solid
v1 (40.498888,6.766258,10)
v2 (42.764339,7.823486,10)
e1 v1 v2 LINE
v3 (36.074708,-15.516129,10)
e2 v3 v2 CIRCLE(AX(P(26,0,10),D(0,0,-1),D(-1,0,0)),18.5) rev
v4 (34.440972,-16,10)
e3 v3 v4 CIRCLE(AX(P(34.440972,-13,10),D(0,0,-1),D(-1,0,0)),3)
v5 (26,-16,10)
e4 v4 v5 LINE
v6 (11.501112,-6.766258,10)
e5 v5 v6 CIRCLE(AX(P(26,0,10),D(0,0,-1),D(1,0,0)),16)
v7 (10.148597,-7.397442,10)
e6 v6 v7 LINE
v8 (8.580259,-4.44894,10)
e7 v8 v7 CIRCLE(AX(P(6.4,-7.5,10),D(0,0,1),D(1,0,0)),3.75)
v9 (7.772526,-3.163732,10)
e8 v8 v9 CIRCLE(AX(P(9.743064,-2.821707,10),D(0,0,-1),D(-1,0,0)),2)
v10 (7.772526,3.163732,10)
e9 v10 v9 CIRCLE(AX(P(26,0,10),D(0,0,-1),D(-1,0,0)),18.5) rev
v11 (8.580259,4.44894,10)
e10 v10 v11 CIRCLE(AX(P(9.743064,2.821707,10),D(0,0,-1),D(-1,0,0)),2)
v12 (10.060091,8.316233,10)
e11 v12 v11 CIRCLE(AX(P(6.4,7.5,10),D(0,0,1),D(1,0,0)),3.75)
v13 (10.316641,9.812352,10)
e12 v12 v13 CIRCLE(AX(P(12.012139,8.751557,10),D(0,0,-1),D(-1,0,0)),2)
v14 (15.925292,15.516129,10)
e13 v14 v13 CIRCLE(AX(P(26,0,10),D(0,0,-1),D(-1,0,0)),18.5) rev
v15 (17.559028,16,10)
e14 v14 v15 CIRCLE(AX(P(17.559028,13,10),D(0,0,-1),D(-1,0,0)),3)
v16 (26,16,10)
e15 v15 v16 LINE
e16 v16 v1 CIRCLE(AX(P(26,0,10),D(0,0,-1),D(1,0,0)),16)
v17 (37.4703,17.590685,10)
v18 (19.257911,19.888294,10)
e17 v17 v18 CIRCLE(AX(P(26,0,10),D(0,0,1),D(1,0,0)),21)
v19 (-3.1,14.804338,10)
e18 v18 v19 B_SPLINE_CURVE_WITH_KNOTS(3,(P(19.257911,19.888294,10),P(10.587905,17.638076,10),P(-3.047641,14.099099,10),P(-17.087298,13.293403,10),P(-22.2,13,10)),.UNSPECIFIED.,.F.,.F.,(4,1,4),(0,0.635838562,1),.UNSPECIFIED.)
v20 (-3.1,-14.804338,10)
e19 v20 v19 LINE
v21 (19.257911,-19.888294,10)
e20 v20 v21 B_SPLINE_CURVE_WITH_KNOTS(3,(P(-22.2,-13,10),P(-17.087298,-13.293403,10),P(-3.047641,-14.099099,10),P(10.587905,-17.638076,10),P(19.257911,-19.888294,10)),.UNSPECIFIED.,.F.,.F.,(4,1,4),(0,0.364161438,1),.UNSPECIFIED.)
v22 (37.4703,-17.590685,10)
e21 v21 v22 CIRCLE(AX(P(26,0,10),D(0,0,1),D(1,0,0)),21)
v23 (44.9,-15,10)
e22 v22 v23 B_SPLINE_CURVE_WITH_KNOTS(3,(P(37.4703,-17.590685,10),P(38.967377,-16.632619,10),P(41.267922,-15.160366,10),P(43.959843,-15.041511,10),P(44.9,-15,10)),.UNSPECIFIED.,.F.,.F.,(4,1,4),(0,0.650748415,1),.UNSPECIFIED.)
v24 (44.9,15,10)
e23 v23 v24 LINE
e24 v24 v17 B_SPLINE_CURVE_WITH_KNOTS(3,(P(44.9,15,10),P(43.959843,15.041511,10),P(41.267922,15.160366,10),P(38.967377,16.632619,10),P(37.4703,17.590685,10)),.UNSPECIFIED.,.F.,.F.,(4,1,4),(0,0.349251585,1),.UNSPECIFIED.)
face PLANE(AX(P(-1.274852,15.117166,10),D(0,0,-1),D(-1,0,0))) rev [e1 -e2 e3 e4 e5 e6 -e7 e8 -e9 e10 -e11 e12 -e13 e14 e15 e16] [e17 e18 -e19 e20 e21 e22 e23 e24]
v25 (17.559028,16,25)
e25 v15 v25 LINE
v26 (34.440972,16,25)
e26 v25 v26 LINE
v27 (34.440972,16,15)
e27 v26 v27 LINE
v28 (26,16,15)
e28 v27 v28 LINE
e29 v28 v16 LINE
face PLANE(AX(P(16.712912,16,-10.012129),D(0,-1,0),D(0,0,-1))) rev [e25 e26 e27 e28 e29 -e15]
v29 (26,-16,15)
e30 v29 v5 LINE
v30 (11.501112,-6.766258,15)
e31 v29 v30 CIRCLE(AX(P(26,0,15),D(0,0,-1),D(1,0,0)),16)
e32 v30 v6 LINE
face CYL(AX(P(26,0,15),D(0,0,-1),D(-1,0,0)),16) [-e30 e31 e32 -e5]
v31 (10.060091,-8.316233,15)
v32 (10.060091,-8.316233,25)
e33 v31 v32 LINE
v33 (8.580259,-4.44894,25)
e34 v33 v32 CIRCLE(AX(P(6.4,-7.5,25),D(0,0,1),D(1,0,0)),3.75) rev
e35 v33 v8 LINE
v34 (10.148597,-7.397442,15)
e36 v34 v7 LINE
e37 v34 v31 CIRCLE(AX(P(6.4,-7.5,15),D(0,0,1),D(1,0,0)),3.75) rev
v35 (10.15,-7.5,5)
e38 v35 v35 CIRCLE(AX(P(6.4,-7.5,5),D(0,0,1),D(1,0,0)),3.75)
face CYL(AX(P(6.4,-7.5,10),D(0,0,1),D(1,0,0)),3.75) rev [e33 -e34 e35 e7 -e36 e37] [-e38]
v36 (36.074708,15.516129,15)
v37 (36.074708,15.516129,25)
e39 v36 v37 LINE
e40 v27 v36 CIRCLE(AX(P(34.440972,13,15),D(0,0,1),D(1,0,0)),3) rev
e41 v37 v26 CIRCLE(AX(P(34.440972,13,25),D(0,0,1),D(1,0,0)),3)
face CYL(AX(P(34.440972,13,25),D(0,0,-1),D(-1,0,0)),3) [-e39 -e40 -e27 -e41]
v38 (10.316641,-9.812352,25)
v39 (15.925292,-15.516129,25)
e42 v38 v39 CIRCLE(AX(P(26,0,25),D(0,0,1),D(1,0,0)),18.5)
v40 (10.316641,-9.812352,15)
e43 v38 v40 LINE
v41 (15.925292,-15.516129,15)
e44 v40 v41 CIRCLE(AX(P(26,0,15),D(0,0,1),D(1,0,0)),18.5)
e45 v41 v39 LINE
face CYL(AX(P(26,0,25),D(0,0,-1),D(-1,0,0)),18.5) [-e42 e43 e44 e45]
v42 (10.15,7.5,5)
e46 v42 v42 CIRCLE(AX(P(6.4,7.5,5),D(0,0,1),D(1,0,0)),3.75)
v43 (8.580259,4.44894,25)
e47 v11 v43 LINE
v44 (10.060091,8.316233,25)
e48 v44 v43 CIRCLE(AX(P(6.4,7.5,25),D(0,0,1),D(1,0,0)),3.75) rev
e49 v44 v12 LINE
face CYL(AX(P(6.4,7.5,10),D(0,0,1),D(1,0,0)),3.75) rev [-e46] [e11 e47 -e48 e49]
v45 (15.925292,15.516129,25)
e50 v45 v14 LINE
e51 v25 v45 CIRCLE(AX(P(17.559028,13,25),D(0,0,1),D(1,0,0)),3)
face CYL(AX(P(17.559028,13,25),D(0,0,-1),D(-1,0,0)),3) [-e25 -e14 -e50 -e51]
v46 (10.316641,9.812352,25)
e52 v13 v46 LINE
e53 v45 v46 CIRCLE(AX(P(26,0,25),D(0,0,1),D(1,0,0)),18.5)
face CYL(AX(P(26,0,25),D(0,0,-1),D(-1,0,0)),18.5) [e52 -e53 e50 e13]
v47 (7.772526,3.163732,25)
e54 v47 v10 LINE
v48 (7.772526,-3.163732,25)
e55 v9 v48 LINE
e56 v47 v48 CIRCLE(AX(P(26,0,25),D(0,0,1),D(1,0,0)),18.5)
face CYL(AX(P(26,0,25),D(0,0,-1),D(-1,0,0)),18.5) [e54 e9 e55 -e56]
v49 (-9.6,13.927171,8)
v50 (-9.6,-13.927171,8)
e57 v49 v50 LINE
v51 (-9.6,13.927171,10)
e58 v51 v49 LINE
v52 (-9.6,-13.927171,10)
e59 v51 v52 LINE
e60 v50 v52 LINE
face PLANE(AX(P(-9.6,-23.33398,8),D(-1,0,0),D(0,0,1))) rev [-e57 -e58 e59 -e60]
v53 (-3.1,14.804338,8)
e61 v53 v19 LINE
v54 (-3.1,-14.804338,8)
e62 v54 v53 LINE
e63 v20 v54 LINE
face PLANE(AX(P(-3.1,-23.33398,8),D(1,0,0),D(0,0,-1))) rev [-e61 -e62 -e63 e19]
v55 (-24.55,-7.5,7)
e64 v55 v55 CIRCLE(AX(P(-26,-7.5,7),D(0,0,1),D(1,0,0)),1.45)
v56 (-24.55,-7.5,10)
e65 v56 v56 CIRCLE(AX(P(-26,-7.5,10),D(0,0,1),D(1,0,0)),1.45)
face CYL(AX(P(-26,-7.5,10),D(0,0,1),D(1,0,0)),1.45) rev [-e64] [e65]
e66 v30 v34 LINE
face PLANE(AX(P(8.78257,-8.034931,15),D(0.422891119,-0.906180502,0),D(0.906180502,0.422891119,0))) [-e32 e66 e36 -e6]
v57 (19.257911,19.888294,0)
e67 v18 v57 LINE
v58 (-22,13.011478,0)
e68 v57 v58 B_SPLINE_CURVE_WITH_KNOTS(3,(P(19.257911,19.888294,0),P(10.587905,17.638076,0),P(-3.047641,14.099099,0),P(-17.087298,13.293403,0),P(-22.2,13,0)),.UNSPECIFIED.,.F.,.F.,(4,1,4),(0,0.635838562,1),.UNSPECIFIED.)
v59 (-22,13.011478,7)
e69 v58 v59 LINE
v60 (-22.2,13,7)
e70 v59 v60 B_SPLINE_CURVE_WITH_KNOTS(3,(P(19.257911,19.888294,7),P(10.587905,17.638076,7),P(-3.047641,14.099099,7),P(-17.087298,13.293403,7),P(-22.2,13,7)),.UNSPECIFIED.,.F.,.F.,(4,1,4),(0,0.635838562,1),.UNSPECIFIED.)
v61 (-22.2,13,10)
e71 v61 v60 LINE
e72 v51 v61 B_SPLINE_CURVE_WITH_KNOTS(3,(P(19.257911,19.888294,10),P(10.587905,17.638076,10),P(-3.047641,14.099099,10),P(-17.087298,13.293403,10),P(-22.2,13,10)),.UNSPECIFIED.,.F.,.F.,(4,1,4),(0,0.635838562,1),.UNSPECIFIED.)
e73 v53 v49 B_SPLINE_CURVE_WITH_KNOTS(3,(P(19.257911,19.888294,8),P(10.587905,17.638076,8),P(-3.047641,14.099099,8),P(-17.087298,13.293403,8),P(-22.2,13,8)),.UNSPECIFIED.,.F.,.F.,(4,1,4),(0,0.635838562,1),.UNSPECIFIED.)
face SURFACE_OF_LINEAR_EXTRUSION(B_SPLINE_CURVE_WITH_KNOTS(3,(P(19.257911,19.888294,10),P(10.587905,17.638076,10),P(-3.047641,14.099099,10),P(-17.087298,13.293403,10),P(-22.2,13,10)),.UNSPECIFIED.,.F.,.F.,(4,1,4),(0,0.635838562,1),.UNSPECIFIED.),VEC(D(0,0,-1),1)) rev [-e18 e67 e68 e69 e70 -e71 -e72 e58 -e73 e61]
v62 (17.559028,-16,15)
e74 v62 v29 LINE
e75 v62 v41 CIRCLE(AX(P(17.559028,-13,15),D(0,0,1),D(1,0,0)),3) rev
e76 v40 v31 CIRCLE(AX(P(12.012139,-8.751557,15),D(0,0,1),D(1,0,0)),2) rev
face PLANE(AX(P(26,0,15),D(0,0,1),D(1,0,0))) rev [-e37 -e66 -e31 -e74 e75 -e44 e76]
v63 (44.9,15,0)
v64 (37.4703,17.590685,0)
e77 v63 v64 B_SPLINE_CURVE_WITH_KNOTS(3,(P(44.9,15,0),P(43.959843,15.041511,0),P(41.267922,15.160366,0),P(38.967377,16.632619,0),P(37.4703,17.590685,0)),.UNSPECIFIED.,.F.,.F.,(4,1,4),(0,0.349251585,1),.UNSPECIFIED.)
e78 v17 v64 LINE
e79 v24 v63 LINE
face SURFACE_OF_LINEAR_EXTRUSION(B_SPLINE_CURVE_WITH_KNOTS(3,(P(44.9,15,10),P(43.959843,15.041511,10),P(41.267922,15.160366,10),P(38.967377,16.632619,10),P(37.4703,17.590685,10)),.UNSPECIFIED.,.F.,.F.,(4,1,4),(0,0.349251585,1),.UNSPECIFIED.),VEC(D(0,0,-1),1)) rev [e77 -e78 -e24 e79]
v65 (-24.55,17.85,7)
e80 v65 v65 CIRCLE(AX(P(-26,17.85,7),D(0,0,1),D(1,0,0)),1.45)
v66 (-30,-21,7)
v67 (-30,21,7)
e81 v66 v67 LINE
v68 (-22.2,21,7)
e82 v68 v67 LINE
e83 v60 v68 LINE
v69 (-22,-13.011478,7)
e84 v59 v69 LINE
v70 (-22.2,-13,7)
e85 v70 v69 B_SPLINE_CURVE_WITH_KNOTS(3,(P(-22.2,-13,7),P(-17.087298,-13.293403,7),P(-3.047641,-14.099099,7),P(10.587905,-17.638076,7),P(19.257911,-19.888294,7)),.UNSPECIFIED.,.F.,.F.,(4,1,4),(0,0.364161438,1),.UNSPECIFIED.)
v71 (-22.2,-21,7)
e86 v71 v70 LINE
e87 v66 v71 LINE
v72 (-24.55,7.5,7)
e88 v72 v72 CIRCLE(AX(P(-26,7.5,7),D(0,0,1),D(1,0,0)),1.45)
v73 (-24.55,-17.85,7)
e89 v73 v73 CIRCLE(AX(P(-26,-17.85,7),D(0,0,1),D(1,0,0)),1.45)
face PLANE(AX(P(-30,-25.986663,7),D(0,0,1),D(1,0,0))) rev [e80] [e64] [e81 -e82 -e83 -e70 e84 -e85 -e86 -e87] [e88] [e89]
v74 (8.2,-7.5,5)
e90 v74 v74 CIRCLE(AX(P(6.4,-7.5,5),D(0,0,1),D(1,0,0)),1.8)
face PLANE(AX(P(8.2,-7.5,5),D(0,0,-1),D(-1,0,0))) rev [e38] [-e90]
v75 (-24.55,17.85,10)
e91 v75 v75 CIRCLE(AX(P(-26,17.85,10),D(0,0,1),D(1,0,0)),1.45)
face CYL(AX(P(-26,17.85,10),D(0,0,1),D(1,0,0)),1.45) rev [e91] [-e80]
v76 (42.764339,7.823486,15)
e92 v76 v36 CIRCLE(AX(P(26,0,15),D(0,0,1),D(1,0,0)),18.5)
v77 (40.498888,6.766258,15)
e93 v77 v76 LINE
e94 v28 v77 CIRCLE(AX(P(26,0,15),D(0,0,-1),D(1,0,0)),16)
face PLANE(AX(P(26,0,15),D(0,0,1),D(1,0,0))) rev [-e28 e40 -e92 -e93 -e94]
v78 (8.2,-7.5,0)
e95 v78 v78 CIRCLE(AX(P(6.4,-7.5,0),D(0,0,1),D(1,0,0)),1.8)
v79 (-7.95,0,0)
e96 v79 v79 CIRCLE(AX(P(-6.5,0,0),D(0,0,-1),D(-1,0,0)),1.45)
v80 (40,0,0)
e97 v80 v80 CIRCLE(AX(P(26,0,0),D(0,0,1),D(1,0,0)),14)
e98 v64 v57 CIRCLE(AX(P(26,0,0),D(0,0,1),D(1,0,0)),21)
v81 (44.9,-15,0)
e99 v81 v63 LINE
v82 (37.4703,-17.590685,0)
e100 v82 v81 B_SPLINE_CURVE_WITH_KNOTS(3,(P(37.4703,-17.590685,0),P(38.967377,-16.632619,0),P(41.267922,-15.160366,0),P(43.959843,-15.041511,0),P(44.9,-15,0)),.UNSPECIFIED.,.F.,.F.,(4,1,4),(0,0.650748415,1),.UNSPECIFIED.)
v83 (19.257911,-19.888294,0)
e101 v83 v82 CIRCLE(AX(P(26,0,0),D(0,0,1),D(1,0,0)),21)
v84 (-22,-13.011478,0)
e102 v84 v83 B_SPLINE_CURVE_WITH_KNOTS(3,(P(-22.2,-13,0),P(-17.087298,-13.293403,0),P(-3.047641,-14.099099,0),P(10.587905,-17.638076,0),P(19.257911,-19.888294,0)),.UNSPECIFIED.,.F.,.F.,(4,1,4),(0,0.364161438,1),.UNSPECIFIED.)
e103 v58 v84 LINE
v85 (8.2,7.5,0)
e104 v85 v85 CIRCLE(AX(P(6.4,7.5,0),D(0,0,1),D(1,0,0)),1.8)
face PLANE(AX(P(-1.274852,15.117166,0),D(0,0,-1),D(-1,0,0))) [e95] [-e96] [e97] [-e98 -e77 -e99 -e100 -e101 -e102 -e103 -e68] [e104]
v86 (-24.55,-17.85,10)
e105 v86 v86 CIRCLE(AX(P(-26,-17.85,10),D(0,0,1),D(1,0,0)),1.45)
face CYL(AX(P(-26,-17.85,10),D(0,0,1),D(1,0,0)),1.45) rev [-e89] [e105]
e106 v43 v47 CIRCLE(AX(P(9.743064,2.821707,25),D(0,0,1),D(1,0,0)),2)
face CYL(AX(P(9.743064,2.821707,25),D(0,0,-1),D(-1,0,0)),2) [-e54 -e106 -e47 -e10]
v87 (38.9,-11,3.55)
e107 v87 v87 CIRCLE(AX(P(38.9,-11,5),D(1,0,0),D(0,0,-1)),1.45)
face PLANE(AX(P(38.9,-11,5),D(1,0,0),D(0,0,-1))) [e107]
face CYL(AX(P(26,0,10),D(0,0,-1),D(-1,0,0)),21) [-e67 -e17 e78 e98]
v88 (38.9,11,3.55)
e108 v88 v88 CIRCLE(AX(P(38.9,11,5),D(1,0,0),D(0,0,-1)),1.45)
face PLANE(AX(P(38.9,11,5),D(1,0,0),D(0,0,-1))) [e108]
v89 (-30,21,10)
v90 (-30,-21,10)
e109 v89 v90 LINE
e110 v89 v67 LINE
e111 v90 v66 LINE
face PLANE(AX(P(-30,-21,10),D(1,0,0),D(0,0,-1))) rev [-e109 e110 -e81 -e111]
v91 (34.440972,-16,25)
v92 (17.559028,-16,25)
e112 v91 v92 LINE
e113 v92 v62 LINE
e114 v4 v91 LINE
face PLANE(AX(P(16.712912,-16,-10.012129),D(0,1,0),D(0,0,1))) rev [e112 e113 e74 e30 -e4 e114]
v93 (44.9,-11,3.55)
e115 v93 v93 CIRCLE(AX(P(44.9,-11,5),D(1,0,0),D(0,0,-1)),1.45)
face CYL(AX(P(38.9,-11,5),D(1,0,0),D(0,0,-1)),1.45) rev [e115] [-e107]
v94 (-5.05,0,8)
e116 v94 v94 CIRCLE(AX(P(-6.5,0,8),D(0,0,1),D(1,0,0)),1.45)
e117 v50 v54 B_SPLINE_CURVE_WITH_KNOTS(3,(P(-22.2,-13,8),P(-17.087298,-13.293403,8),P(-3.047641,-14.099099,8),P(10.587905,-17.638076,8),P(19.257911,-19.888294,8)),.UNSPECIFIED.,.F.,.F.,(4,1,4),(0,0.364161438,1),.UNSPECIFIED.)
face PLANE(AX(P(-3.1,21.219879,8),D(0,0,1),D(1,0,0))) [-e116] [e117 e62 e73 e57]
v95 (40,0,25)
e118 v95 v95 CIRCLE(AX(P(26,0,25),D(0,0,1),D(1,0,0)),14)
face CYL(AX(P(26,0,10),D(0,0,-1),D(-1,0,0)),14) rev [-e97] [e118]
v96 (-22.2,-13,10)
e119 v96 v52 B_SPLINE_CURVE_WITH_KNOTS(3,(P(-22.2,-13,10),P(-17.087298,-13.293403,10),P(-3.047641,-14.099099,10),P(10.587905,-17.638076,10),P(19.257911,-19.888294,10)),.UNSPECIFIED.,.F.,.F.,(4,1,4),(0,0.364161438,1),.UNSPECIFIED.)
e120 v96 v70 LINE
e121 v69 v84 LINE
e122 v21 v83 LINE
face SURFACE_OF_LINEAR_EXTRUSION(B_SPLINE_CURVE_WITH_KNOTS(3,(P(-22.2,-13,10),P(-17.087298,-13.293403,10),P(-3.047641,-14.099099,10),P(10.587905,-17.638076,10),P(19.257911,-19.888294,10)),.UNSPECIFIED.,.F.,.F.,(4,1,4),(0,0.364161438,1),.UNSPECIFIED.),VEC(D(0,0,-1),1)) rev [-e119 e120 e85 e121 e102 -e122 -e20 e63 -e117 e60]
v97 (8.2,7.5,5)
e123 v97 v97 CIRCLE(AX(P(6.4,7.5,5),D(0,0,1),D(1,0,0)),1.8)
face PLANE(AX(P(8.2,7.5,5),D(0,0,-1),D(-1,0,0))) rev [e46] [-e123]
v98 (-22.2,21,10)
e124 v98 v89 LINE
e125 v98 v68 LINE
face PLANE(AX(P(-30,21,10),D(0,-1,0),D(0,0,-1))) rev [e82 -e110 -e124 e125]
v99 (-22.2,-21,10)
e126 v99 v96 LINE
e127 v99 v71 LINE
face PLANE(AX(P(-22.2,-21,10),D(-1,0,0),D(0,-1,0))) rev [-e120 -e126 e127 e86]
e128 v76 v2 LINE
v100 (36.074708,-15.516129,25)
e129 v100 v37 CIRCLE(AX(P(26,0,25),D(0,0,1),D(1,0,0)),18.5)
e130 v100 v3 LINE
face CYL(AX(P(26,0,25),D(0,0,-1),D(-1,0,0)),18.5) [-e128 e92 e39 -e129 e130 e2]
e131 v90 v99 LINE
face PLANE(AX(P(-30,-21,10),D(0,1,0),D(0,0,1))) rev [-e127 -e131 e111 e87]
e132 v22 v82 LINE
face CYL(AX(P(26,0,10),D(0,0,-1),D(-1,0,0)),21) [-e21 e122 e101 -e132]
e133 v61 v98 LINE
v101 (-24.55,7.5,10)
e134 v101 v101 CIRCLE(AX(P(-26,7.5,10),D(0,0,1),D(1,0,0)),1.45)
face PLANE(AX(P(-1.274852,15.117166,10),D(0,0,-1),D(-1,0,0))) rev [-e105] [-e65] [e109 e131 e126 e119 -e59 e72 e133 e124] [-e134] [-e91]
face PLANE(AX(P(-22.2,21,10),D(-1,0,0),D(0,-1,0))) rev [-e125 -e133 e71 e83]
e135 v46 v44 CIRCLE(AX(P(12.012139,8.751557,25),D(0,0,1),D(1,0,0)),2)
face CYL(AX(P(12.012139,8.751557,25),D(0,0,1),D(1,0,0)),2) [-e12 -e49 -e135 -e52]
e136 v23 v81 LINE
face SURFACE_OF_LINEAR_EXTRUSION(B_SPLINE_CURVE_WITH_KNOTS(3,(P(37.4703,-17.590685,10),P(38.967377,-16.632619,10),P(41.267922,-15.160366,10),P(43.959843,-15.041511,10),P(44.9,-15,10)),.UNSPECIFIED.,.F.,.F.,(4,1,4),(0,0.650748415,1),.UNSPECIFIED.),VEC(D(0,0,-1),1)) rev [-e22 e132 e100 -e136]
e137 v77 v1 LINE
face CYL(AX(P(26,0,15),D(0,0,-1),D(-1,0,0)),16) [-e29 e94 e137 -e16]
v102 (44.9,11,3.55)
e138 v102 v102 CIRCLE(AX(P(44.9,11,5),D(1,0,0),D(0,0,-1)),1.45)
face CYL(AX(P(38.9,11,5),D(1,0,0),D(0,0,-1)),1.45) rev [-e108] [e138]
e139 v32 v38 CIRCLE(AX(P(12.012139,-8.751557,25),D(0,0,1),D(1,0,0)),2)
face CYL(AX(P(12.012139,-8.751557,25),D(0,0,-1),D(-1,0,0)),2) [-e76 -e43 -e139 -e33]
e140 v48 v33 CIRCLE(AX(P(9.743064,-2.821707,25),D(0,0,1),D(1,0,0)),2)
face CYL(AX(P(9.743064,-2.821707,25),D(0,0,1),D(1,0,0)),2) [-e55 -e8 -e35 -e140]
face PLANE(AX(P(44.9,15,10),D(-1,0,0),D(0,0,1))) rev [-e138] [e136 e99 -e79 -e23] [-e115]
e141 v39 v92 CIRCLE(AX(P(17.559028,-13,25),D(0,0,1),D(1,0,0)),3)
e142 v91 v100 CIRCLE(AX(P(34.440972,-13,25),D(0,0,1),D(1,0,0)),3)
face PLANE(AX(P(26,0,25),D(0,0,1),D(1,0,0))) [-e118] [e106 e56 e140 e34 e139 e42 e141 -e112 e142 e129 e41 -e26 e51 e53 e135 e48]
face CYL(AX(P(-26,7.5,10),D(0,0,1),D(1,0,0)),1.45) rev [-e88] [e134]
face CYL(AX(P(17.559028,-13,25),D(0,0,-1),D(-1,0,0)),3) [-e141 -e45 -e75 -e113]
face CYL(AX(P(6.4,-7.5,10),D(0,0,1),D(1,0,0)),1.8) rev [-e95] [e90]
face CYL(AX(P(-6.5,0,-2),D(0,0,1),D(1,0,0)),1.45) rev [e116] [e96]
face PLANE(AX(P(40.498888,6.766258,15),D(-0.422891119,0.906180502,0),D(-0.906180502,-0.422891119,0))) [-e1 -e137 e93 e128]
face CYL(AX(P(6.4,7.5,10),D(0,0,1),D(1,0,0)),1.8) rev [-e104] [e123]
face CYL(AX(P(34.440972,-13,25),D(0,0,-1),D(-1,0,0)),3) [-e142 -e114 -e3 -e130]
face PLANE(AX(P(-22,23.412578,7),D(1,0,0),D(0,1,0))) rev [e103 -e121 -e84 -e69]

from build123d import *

# Parameters (mm, degrees)
SKETCH1_R                                     = 14
EXTRUDE1_DEPTH                                = 10
SKETCH3_R                                     = 18.5
SKETCH3_R_2                                   = 14
EXTRUDE2_DEPTH                                = 15
EXTRUDE3_DEPTH                                = 7
CBORE_FOR_M3_PAN_HEAD_MACHINE_SCREW1_AT_COUNT = 2
CBORE_FOR_M3_PAN_HEAD_MACHINE_SCREW1_AT_PITCH = 14.99999999999997
EXTRUDE4_START                                = 20
SKETCH6_R                                     = 3.7499999999999996
EXTRUDE4_DEPTH                                = 20
FILLET1_R                                     = 2
SKETCH8_W                                     = 18.574175621006713
SKETCH8_H                                     = 7.448846743952753
EXTRUDE5_DEPTH                                = 15
FILLET2_R                                     = 3
EXTRUDE8_DEPTH                                = 5
F_2_9_2_9_DIAMETER_HOLE1_D                    = 2.9
F_2_9_2_9_DIAMETER_HOLE1_DEPTH                = 10
SKETCH14_W                                    = 6.5
SKETCH14_H                                    = 44.553858890679976
EXTRUDE9_DEPTH                                = 2
SKETCH15_R                                    = 1.45
EXTRUDE10_DEPTH                               = 10
SKETCH16_R                                    = 1.45
EXTRUDE11_DEPTH                               = 6


with BuildPart() as part:
    # Sketch1 → Extrude1 (new body)
    with BuildSketch(Plane.XY):
        with BuildLine():
            Line((-30, 21), (-22.199999999999996, 21))
            Line((-22.199999999999996, 21), (-22.199999999999996, 13.000000000000002))
            add(Edge.make_bspline(
                [(-22.199999999999996, 13.000000000000002), (-17.087298132677002, 13.293403264574941), (-3.0476406189760237, 14.099098854681937), (10.587905202926116, 17.638075889977564), (19.257911052248826, 19.88829395952834)],
                knots=[0, 0, 0, 0, 0.36416143786510685, 1, 1, 1, 1], degree=3))
            ThreePointArc((19.257911052248826, 19.88829395952834), (28.628449534780575, 20.83485668400702), (37.47030029247324, 17.590685353347904))
            add(Edge.make_bspline(
                [(44.90000000000001, 15), (43.95984253847409, 15.041510539741976), (41.267922149986155, 15.160366234496765), (38.96737663845901, 16.632619120705193), (37.47030029247324, 17.590685353347904)],
                knots=[0, 0, 0, 0, 0.3492515846852426, 1, 1, 1, 1], degree=3))
            Line((44.90000000000001, 15), (44.90000000000001, -15))
            add(Edge.make_bspline(
                [(44.90000000000001, -15), (43.95984253847409, -15.041510539741976), (41.267922149986155, -15.160366234496761), (38.96737663845901, -16.632619120705193), (37.47030029247324, -17.590685353347904)],
                knots=[0, 0, 0, 0, 0.3492515846852426, 1, 1, 1, 1], degree=3))
            ThreePointArc((37.47030029247324, -17.590685353347904), (28.628449534780575, -20.834856684007015), (19.257911052248826, -19.88829395952834))
            add(Edge.make_bspline(
                [(-22.199999999999996, -13.000000000000002), (-17.087298132677002, -13.293403264574941), (-3.0476406189760232, -14.099098854681936), (10.587905202926116, -17.638075889977564), (19.257911052248826, -19.88829395952834)],
                knots=[0, 0, 0, 0, 0.36416143786510685, 1, 1, 1, 1], degree=3))
            Line((-22.199999999999996, -13.000000000000002), (-22.199999999999996, -21))
            Line((-22.199999999999996, -21), (-30, -21))
            Line((-30, -21), (-30, 21))
        make_face()
        with Locations((26.000000000000004, 0)):
            Circle(SKETCH1_R, mode=Mode.SUBTRACT)
    extrude(amount=EXTRUDE1_DEPTH)

    # Sketch3 → Extrude2 (add)
    with BuildSketch(Plane.XY.offset(10)):
        with Locations(Location((26.000000000000004, 0, 0), (0, 0, 180))):
            Circle(SKETCH3_R)
        with Locations((26.000000000000004, 0)):
            Circle(SKETCH3_R_2, mode=Mode.SUBTRACT)
    extrude(amount=EXTRUDE2_DEPTH)

    # Sketch4 → Extrude3 (cut)
    with BuildSketch(Plane(origin=(0, 0, 0), x_dir=(-1, 0, 0), z_dir=(0, 0, -1))):
        Polygon((30, 23.412577815179247), (22, 23.412577815179247), (22.000000000000007, -25.98666339363831), (30.000000000000007, -25.98666339363831), align=None)
    extrude(amount=-EXTRUDE3_DEPTH, mode=Mode.SUBTRACT)

    # Sketch5 → CBORE for M3 Pan Head Machine Screw1 (revolve, cut)
    with BuildSketch(Plane(origin=(6.399999999999998, 7.499999999999986, 10), x_dir=(0, -1, 0), z_dir=(1, 0, 0))):
        Polygon((0, 0), (-2.45e-15, 9.999999999999998), (1.7999999999999978, 10), (1.7999999999999994, 4.999999999999999), (3.749999999999999, 4.999999999999999), (3.75, 0), align=None)
    cbore_for_m3_pan_head_machine_screw1 = revolve(axis=Axis((6.399999999999998, 7.499999999999986, 16.34999999999999), (0, 0, -1)), mode=Mode.SUBTRACT)

    # CBORE for M3 Pan Head Machine Screw1 at: CBORE for M3 Pan Head Machine Screw1 ×2
    with Locations(*[(0, -i * CBORE_FOR_M3_PAN_HEAD_MACHINE_SCREW1_AT_PITCH, 0) for i in range(1, CBORE_FOR_M3_PAN_HEAD_MACHINE_SCREW1_AT_COUNT)]):
        add(cbore_for_m3_pan_head_machine_screw1, mode=Mode.SUBTRACT)

    # Sketch6 → Extrude4 (cut)
    with BuildSketch(Plane.XY.offset(10).offset(EXTRUDE4_START)):
        with Locations((6.399999999999998, 7.499999999999986)):
            Circle(SKETCH6_R)
        with Locations((6.399999999999998, -7.499999999999984)):
            Circle(SKETCH6_R)
    extrude(amount=-EXTRUDE4_DEPTH, mode=Mode.SUBTRACT)

    # Fillet1
    fillet1_edges = [part.edges().sort_by_distance(p)[0] for p in [
        (7.957487706286119, -4.088734539094374, 17.5),
        (9.836860741750934, -9.000162738442441, 17.5),
        (9.836860741750938, 9.000162738442443, 17.5),
        (7.957487706286121, 4.088734539094375, 17.5),
    ]]
    fillet(fillet1_edges, radius=FILLET1_R)

    # Sketch8 → Extrude5 (cut)
    with BuildSketch(Plane.XY.offset(25)):
        with Locations((26, 19.72442337197638)):
            Rectangle(SKETCH8_W, SKETCH8_H)
        with Locations((26, -19.72442337197638)):
            Rectangle(SKETCH8_W, SKETCH8_H)
    extrude(amount=-EXTRUDE5_DEPTH, mode=Mode.SUBTRACT)

    # Fillet2
    fillet2_edges = [part.edges().sort_by_distance(p)[0] for p in [
        (35.28708781050336, 16, 17.5),
        (16.712912189496645, 16, 17.5),
        (35.28708781050336, -16, 17.5),
        (16.712912189496645, -16, 17.5),
    ]]
    fillet(fillet2_edges, radius=FILLET2_R)

    # Sketch11 → Extrude8 (cut)
    with BuildSketch(Plane.XY.offset(10)):
        with BuildLine():
            Line((26.000000000000004, 16.000000000000004), (26.000000000000004, 18.999999999999996))
            ThreePointArc((26.000000000000004, 18.999999999999996), (36.206280080860964, 16.025974132982387), (43.21742953366855, 8.034931253791655))
            Line((43.21742953366855, 8.034931253791655), (40.49888802835247, 6.766257897929818))
            ThreePointArc((40.49888802835247, 6.766257897929818), (34.5947621733566, 13.495557164616752), (26.000000000000004, 16.000000000000004))
        make_face()
        with BuildLine():
            Line((26.000000000000004, -16.000000000000004), (26.000000000000004, -18.999999999999996))
            ThreePointArc((26.000000000000004, -18.999999999999996), (15.793719919139045, -16.025974132982395), (8.782570466331453, -8.034931253791656))
            Line((8.782570466331453, -8.034931253791656), (11.501111971647536, -6.766257897929817))
            ThreePointArc((11.501111971647536, -6.766257897929817), (17.405237826643408, -13.495557164616757), (26.000000000000004, -16.000000000000004))
        make_face()
    extrude(amount=EXTRUDE8_DEPTH, mode=Mode.SUBTRACT)

    # Ø2.9 (2.9) Diameter Hole1
    with Locations(Plane(origin=(-26, -17.85, 10), x_dir=(1, 0, 0), z_dir=(0, 0, 1))):
        with Locations((0, 0), (0, 10.35), (0, 25.35), (0, 35.7)):
            Hole(F_2_9_2_9_DIAMETER_HOLE1_D / 2, depth=F_2_9_2_9_DIAMETER_HOLE1_DEPTH)

    # Sketch14 → Extrude9 (cut)
    with BuildSketch(Plane.XY.offset(10)):
        with Locations((-6.350000000000001, -1.057050154528838)):
            Rectangle(SKETCH14_W, SKETCH14_H)
    extrude(amount=-EXTRUDE9_DEPTH, mode=Mode.SUBTRACT)

    # Sketch15 → Extrude10 (cut)
    with BuildSketch(Plane.XY.offset(8)):
        with Locations((-6.500000000000001, 1.73e-15)):
            Circle(SKETCH15_R)
    extrude(amount=-EXTRUDE10_DEPTH, mode=Mode.SUBTRACT)

    # Sketch16 → Extrude11 (cut)
    with BuildSketch(Plane(origin=(44.90000000000001, 0, 0), x_dir=(0, 0, -1), z_dir=(1, 0, 0))):
        with Locations((-5, -11)):
            Circle(SKETCH16_R)
        with Locations((-5, 11)):
            Circle(SKETCH16_R)
    extrude(amount=-EXTRUDE11_DEPTH, mode=Mode.SUBTRACT)


solid = part.part
